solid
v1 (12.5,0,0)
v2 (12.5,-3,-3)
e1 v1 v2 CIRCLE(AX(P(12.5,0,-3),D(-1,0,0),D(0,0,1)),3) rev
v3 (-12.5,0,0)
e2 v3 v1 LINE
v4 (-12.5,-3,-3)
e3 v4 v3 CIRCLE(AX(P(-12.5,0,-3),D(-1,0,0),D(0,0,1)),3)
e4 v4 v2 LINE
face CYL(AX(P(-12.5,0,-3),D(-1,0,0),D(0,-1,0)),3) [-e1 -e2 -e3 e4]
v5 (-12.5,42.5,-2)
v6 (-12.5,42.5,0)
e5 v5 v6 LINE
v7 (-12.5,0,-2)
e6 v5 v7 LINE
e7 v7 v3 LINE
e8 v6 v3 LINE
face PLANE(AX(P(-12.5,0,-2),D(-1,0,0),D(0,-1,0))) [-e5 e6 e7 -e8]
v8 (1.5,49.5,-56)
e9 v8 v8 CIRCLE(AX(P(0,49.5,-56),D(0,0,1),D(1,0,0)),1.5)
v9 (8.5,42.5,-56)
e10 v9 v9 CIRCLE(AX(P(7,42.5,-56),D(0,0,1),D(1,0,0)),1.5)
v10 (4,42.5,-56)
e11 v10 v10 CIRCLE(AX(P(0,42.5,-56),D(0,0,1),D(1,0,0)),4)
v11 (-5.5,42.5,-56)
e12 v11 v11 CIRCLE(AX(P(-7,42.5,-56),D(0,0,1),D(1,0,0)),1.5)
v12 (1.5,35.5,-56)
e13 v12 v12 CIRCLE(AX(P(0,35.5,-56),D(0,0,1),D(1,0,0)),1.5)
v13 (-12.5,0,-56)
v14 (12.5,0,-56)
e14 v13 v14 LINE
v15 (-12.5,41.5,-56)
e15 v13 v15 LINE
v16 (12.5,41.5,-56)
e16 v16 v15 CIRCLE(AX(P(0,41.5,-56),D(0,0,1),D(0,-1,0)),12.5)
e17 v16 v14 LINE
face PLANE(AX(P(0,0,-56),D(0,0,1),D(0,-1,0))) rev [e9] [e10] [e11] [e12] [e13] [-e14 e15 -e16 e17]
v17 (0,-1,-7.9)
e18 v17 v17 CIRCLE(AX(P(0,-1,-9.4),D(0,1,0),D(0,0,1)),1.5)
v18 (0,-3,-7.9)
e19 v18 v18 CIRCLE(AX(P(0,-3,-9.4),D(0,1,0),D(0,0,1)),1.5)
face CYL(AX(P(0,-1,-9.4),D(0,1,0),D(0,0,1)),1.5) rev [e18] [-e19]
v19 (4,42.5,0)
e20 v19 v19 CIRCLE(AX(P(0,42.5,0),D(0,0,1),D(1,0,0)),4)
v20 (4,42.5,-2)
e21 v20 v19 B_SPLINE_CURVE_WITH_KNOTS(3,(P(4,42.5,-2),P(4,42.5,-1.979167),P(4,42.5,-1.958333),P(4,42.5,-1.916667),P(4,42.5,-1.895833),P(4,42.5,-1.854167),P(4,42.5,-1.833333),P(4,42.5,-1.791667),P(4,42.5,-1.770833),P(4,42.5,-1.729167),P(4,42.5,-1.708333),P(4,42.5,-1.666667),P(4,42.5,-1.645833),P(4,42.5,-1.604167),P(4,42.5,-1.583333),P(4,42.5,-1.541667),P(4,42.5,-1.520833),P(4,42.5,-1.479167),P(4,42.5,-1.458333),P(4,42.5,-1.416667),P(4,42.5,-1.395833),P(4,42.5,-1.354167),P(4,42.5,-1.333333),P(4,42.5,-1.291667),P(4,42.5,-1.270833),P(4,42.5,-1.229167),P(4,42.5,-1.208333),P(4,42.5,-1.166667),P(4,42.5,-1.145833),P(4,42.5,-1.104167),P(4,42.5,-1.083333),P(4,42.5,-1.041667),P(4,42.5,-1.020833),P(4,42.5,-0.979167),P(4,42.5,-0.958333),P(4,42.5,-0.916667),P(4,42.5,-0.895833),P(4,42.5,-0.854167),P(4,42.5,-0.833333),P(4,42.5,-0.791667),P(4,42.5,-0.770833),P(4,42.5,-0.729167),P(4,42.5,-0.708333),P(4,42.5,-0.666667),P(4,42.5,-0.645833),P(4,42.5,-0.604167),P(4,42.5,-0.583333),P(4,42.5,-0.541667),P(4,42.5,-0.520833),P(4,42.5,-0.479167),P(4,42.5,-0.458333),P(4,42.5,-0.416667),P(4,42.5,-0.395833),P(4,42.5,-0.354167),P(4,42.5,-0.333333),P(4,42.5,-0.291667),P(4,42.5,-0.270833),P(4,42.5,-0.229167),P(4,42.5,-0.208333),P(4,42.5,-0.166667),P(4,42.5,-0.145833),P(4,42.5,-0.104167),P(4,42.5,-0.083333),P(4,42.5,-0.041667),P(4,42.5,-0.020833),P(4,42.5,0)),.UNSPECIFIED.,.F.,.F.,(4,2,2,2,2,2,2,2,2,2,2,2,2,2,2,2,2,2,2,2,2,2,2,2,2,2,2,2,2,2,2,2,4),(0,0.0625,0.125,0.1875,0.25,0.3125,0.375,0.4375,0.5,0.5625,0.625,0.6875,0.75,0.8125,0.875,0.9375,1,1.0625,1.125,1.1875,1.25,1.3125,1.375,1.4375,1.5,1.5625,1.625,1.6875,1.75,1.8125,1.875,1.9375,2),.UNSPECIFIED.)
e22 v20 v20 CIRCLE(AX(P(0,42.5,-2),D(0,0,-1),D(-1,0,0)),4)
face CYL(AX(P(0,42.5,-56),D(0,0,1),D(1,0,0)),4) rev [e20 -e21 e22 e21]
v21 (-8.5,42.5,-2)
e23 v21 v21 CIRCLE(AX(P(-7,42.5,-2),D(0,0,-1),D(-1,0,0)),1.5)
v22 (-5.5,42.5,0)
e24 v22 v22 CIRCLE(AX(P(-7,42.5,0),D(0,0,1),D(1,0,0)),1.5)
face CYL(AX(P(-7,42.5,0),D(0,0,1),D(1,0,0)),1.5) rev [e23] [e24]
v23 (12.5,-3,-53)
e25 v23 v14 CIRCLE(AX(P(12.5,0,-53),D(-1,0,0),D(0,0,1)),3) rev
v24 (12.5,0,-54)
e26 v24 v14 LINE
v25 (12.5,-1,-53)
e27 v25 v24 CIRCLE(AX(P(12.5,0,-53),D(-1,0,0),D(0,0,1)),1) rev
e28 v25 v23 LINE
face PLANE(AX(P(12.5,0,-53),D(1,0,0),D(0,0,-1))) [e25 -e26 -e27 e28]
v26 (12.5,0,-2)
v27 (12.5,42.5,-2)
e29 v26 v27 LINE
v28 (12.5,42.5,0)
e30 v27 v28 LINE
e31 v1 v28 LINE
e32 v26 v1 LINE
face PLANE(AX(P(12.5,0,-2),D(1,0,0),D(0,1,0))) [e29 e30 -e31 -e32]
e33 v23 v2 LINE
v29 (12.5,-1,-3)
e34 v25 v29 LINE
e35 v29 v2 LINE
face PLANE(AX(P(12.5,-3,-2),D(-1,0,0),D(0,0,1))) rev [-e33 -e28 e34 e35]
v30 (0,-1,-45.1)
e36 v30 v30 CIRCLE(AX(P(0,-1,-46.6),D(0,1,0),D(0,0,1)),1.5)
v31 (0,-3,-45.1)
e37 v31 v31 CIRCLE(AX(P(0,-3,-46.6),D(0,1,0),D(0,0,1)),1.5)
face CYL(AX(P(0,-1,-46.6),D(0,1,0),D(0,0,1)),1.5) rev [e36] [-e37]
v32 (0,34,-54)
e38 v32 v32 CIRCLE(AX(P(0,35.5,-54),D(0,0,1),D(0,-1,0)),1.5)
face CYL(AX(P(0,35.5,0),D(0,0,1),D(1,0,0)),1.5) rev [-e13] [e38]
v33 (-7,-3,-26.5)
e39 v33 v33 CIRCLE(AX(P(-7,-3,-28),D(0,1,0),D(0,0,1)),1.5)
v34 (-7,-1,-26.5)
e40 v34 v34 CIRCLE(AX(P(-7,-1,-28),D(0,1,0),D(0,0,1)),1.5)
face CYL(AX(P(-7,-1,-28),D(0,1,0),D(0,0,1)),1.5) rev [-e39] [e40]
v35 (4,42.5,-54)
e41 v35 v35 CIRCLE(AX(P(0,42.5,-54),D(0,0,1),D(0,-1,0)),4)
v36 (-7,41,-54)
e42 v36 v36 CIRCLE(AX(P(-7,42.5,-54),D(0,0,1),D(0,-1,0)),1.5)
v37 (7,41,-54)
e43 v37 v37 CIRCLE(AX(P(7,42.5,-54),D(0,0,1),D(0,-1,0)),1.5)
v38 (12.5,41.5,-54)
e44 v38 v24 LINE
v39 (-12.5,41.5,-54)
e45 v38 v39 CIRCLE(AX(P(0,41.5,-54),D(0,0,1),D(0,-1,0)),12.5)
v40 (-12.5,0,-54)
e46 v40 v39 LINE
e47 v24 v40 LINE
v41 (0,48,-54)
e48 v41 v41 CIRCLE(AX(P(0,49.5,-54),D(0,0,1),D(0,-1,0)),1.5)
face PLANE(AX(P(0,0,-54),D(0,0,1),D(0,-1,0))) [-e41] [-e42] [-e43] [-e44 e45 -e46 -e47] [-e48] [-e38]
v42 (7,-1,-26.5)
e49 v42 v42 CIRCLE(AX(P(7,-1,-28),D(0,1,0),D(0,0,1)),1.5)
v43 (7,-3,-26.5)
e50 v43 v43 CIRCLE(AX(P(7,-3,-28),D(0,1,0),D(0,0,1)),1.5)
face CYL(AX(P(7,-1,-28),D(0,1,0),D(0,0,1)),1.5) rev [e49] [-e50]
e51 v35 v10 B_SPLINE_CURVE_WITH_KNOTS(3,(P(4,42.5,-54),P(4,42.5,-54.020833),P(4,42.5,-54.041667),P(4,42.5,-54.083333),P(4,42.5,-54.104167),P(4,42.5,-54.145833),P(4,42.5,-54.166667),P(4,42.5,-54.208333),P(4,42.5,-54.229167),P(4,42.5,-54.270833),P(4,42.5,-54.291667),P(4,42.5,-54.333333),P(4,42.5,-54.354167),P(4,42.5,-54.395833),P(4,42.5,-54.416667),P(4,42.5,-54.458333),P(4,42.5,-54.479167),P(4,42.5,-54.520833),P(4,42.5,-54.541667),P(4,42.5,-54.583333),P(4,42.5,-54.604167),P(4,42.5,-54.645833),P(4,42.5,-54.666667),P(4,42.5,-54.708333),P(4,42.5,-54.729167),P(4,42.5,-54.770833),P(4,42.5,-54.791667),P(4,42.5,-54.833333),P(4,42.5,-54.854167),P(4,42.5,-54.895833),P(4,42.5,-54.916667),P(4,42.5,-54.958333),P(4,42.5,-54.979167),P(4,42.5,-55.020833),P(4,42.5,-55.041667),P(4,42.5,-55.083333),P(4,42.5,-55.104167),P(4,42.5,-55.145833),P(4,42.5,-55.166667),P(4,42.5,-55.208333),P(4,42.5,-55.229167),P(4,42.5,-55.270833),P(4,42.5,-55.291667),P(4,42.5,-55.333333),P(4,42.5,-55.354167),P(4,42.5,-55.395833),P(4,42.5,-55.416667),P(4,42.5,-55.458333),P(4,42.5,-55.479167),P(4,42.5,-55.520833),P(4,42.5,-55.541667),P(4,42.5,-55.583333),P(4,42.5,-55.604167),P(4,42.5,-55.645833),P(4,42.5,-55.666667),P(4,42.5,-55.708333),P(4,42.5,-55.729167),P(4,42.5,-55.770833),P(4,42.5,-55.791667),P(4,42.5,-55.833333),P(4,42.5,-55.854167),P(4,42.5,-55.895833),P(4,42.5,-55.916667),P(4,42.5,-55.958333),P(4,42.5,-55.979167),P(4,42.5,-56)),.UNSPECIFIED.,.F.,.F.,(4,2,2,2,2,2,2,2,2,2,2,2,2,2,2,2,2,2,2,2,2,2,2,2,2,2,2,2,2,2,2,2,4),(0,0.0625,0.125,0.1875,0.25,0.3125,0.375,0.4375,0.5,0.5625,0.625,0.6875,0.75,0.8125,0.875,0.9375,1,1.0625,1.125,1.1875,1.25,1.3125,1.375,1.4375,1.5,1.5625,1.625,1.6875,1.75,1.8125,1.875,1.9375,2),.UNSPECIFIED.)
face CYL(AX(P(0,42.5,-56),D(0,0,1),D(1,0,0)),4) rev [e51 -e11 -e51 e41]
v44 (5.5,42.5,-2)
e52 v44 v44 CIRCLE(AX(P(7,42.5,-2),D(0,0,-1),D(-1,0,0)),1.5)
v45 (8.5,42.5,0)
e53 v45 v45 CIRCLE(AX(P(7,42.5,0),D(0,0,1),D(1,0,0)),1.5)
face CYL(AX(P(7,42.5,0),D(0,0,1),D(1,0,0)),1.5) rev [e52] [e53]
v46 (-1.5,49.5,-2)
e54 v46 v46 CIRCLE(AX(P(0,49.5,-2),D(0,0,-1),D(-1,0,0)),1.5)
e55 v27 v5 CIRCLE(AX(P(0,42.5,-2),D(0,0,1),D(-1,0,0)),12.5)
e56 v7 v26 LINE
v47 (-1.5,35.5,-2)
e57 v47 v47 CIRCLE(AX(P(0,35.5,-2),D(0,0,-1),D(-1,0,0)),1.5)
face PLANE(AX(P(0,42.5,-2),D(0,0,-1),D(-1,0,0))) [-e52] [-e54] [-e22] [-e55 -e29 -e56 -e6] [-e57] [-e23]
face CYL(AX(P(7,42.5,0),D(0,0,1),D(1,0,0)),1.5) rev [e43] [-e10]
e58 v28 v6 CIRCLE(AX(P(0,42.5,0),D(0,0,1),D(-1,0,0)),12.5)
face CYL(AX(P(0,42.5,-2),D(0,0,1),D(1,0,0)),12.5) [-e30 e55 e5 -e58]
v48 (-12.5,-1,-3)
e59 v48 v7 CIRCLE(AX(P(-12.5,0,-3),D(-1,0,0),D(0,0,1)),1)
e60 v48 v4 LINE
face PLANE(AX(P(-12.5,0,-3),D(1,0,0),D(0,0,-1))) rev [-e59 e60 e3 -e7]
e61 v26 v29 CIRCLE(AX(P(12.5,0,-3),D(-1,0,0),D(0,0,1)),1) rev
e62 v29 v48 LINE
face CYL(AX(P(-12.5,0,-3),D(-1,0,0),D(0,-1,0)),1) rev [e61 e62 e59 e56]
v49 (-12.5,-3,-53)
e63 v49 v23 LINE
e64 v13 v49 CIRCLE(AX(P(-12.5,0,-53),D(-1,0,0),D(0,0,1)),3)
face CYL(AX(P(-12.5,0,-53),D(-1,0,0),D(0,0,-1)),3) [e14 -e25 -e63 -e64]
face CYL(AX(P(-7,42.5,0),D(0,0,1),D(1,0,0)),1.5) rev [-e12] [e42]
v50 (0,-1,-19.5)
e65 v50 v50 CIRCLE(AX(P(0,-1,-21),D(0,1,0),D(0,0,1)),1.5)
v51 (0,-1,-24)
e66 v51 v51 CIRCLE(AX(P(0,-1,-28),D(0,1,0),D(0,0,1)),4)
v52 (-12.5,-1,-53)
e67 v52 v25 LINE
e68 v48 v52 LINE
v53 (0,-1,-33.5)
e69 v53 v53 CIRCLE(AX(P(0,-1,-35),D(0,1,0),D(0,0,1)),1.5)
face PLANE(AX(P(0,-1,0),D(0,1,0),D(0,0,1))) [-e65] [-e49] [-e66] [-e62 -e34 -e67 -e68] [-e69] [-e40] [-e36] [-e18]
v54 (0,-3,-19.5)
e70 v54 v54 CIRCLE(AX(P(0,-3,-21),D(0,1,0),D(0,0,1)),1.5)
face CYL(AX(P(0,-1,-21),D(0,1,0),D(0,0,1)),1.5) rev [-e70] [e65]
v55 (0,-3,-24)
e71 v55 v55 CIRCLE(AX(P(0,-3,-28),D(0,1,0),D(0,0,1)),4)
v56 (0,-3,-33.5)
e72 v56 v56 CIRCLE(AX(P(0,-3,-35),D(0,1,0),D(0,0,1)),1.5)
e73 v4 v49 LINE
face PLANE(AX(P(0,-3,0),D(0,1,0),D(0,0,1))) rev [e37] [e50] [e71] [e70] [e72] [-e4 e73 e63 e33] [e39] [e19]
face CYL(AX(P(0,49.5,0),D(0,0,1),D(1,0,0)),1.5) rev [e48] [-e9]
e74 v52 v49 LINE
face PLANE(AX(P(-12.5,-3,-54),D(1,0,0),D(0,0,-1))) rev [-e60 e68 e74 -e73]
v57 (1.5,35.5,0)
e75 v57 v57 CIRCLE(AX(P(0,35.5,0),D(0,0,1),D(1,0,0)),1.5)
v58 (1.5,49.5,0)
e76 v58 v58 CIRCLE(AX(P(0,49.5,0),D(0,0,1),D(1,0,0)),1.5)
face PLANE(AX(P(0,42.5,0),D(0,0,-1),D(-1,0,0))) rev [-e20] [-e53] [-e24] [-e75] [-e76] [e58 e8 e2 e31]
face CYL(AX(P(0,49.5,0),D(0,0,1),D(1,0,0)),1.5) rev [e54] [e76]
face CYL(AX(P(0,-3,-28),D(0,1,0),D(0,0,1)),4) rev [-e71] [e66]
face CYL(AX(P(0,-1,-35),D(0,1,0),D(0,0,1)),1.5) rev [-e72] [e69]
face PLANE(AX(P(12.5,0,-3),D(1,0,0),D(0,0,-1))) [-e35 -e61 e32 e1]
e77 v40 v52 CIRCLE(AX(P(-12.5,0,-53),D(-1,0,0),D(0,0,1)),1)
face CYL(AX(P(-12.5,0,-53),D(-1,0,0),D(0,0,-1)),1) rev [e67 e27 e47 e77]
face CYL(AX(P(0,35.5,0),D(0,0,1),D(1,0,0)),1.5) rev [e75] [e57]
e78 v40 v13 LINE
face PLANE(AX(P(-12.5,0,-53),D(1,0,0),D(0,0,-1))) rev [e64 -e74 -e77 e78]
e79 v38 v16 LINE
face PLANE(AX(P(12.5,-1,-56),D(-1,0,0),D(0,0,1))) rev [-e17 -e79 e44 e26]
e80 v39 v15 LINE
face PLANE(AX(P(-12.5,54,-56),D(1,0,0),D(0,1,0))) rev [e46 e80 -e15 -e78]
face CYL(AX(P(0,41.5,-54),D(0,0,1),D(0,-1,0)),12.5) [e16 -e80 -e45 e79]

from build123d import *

# Parameters (mm, degrees)
BASE_FLANGE1_DEPTH           = 2
EDGE_FLANGE1_DEPTH           = 25
EDGE_FLANGE2_STRIP_W         = 10
EDGE_FLANGE2_STRIP_H         = 2
EDGE_FLANGE2_STRIP_CUT_DEPTH = 25
EDGE_FLANGE2_DEPTH           = 25
CUT_EXTRUDE1_DEPTH           = 2
SKETCH19_R                   = 4
CUT_EXTRUDE2_DEPTH           = 80.481129836
M3X0_5_TAPPED_HOLE1_D        = 3
SKETCH22_R                   = 4
CUT_EXTRUDE3_DEPTH           = 81.176368089
M3X0_5_TAPPED_HOLE2_D        = 3


# Sheet-metal steps are written as plain solids
with BuildPart() as part:
    # Sketch8 → Base-Flange1 (new body)
    with BuildSketch(Plane.XY):
        with BuildLine():
            Line((-12.5, 0), (12.5, 0))
            Line((12.5, 0), (12.5, 42.5))
            ThreePointArc((12.5, 42.5), (0, 55), (-12.5, 42.5))
            Line((-12.5, 42.5), (-12.5, 0))
        make_face()
    extrude(amount=-BASE_FLANGE1_DEPTH)

    # Edge-Flange1 section (across the edge) → Edge-Flange1 (add)
    with BuildSketch(Plane(origin=(12.5, -1, -2), x_dir=(0, 1, 0), z_dir=(-1, 0, 0))):
        with BuildLine():
            Line((-2, 1), (-2, 52))
            Line((-2, 52), (0, 52))
            Line((0, 52), (0, 1))
            ThreePointArc((0, 1), (0.292893219, 0.292893219), (1, 0))
            Line((1, 0), (1, -2))
            ThreePointArc((1, -2), (-1.121320344, -1.121320344), (-2, 1))
        make_face()
    extrude(amount=EDGE_FLANGE1_DEPTH)

    # Edge-Flange2 strip (across the edge) → Edge-Flange2 strip cut (cut)
    with BuildSketch(Plane(origin=(12.5, -1, -54), x_dir=(0, 0, 1), z_dir=(-1, 0, 0))):
        with Locations((-4, -1)):
            Rectangle(EDGE_FLANGE2_STRIP_W, EDGE_FLANGE2_STRIP_H)
    extrude(amount=EDGE_FLANGE2_STRIP_CUT_DEPTH, mode=Mode.SUBTRACT)

    # Edge-Flange2 section (across the edge) → Edge-Flange2 (add)
    with BuildSketch(Plane(origin=(12.5, -1, -54), x_dir=(0, 0, 1), z_dir=(-1, 0, 0))):
        with BuildLine():
            Line((-2, 1), (-2, 55))
            Line((-2, 55), (0, 55))
            Line((0, 55), (0, 1))
            ThreePointArc((0, 1), (0.292893219, 0.292893219), (1, 0))
            Line((1, 0), (1, -2))
            ThreePointArc((1, -2), (-1.121320344, -1.121320344), (-2, 1))
        make_face()
    extrude(amount=EDGE_FLANGE2_DEPTH)

    # Sketch18 → Cut-Extrude1 (cut)
    with BuildSketch(Plane(origin=(0, 0, -56), x_dir=(-1, 0, 0), z_dir=(0, 0, -1))):
        with BuildLine():
            ThreePointArc((0, 54), (8.838834765, 50.338834765), (12.5, 41.5))
            Line((12.5, 41.5), (12.5, 54))
            Line((12.5, 54), (0, 54))
        make_face()
        with BuildLine():
            ThreePointArc((-12.5, 41.5), (-8.838834765, 50.338834765), (0, 54))
            Line((0, 54), (-12.5, 54))
            Line((-12.5, 54), (-12.5, 41.5))
        make_face()
    extrude(amount=-CUT_EXTRUDE1_DEPTH, mode=Mode.SUBTRACT)

    # Sketch19 → Cut-Extrude2 (cut, through all)
    with BuildSketch(Plane.XY):
        with Locations((0, 42.5)):
            Circle(SKETCH19_R)
    extrude(amount=-CUT_EXTRUDE2_DEPTH, mode=Mode.SUBTRACT)

    # M3x0.5 Tapped Hole1 (through all)
    with Locations(Plane.XY):
        with Locations((0, 49.5), (-7, 42.5), (0, 35.5), (7, 42.5)):
            Hole(M3X0_5_TAPPED_HOLE1_D / 2)

    # Sketch22 → Cut-Extrude3 (cut, through all)
    with BuildSketch(Plane(origin=(0, -1, 0), x_dir=(1, 0, 0), z_dir=(0, 1, 0))):
        with Locations(Location((0, 28, 0), (0, 0, 270))):
            Circle(SKETCH22_R)
    extrude(amount=-CUT_EXTRUDE3_DEPTH, mode=Mode.SUBTRACT)

    # M3x0.5 Tapped Hole2 (through all)
    with Locations(Plane(origin=(0, -1, 0), x_dir=(1, 0, 0), z_dir=(0, 1, 0))):
        with Locations((7, 28), (-7, 28), (0, 35), (0, 21), (0, 9.4), (0, 46.6)):
            Hole(M3X0_5_TAPPED_HOLE2_D / 2)


solid = part.part
